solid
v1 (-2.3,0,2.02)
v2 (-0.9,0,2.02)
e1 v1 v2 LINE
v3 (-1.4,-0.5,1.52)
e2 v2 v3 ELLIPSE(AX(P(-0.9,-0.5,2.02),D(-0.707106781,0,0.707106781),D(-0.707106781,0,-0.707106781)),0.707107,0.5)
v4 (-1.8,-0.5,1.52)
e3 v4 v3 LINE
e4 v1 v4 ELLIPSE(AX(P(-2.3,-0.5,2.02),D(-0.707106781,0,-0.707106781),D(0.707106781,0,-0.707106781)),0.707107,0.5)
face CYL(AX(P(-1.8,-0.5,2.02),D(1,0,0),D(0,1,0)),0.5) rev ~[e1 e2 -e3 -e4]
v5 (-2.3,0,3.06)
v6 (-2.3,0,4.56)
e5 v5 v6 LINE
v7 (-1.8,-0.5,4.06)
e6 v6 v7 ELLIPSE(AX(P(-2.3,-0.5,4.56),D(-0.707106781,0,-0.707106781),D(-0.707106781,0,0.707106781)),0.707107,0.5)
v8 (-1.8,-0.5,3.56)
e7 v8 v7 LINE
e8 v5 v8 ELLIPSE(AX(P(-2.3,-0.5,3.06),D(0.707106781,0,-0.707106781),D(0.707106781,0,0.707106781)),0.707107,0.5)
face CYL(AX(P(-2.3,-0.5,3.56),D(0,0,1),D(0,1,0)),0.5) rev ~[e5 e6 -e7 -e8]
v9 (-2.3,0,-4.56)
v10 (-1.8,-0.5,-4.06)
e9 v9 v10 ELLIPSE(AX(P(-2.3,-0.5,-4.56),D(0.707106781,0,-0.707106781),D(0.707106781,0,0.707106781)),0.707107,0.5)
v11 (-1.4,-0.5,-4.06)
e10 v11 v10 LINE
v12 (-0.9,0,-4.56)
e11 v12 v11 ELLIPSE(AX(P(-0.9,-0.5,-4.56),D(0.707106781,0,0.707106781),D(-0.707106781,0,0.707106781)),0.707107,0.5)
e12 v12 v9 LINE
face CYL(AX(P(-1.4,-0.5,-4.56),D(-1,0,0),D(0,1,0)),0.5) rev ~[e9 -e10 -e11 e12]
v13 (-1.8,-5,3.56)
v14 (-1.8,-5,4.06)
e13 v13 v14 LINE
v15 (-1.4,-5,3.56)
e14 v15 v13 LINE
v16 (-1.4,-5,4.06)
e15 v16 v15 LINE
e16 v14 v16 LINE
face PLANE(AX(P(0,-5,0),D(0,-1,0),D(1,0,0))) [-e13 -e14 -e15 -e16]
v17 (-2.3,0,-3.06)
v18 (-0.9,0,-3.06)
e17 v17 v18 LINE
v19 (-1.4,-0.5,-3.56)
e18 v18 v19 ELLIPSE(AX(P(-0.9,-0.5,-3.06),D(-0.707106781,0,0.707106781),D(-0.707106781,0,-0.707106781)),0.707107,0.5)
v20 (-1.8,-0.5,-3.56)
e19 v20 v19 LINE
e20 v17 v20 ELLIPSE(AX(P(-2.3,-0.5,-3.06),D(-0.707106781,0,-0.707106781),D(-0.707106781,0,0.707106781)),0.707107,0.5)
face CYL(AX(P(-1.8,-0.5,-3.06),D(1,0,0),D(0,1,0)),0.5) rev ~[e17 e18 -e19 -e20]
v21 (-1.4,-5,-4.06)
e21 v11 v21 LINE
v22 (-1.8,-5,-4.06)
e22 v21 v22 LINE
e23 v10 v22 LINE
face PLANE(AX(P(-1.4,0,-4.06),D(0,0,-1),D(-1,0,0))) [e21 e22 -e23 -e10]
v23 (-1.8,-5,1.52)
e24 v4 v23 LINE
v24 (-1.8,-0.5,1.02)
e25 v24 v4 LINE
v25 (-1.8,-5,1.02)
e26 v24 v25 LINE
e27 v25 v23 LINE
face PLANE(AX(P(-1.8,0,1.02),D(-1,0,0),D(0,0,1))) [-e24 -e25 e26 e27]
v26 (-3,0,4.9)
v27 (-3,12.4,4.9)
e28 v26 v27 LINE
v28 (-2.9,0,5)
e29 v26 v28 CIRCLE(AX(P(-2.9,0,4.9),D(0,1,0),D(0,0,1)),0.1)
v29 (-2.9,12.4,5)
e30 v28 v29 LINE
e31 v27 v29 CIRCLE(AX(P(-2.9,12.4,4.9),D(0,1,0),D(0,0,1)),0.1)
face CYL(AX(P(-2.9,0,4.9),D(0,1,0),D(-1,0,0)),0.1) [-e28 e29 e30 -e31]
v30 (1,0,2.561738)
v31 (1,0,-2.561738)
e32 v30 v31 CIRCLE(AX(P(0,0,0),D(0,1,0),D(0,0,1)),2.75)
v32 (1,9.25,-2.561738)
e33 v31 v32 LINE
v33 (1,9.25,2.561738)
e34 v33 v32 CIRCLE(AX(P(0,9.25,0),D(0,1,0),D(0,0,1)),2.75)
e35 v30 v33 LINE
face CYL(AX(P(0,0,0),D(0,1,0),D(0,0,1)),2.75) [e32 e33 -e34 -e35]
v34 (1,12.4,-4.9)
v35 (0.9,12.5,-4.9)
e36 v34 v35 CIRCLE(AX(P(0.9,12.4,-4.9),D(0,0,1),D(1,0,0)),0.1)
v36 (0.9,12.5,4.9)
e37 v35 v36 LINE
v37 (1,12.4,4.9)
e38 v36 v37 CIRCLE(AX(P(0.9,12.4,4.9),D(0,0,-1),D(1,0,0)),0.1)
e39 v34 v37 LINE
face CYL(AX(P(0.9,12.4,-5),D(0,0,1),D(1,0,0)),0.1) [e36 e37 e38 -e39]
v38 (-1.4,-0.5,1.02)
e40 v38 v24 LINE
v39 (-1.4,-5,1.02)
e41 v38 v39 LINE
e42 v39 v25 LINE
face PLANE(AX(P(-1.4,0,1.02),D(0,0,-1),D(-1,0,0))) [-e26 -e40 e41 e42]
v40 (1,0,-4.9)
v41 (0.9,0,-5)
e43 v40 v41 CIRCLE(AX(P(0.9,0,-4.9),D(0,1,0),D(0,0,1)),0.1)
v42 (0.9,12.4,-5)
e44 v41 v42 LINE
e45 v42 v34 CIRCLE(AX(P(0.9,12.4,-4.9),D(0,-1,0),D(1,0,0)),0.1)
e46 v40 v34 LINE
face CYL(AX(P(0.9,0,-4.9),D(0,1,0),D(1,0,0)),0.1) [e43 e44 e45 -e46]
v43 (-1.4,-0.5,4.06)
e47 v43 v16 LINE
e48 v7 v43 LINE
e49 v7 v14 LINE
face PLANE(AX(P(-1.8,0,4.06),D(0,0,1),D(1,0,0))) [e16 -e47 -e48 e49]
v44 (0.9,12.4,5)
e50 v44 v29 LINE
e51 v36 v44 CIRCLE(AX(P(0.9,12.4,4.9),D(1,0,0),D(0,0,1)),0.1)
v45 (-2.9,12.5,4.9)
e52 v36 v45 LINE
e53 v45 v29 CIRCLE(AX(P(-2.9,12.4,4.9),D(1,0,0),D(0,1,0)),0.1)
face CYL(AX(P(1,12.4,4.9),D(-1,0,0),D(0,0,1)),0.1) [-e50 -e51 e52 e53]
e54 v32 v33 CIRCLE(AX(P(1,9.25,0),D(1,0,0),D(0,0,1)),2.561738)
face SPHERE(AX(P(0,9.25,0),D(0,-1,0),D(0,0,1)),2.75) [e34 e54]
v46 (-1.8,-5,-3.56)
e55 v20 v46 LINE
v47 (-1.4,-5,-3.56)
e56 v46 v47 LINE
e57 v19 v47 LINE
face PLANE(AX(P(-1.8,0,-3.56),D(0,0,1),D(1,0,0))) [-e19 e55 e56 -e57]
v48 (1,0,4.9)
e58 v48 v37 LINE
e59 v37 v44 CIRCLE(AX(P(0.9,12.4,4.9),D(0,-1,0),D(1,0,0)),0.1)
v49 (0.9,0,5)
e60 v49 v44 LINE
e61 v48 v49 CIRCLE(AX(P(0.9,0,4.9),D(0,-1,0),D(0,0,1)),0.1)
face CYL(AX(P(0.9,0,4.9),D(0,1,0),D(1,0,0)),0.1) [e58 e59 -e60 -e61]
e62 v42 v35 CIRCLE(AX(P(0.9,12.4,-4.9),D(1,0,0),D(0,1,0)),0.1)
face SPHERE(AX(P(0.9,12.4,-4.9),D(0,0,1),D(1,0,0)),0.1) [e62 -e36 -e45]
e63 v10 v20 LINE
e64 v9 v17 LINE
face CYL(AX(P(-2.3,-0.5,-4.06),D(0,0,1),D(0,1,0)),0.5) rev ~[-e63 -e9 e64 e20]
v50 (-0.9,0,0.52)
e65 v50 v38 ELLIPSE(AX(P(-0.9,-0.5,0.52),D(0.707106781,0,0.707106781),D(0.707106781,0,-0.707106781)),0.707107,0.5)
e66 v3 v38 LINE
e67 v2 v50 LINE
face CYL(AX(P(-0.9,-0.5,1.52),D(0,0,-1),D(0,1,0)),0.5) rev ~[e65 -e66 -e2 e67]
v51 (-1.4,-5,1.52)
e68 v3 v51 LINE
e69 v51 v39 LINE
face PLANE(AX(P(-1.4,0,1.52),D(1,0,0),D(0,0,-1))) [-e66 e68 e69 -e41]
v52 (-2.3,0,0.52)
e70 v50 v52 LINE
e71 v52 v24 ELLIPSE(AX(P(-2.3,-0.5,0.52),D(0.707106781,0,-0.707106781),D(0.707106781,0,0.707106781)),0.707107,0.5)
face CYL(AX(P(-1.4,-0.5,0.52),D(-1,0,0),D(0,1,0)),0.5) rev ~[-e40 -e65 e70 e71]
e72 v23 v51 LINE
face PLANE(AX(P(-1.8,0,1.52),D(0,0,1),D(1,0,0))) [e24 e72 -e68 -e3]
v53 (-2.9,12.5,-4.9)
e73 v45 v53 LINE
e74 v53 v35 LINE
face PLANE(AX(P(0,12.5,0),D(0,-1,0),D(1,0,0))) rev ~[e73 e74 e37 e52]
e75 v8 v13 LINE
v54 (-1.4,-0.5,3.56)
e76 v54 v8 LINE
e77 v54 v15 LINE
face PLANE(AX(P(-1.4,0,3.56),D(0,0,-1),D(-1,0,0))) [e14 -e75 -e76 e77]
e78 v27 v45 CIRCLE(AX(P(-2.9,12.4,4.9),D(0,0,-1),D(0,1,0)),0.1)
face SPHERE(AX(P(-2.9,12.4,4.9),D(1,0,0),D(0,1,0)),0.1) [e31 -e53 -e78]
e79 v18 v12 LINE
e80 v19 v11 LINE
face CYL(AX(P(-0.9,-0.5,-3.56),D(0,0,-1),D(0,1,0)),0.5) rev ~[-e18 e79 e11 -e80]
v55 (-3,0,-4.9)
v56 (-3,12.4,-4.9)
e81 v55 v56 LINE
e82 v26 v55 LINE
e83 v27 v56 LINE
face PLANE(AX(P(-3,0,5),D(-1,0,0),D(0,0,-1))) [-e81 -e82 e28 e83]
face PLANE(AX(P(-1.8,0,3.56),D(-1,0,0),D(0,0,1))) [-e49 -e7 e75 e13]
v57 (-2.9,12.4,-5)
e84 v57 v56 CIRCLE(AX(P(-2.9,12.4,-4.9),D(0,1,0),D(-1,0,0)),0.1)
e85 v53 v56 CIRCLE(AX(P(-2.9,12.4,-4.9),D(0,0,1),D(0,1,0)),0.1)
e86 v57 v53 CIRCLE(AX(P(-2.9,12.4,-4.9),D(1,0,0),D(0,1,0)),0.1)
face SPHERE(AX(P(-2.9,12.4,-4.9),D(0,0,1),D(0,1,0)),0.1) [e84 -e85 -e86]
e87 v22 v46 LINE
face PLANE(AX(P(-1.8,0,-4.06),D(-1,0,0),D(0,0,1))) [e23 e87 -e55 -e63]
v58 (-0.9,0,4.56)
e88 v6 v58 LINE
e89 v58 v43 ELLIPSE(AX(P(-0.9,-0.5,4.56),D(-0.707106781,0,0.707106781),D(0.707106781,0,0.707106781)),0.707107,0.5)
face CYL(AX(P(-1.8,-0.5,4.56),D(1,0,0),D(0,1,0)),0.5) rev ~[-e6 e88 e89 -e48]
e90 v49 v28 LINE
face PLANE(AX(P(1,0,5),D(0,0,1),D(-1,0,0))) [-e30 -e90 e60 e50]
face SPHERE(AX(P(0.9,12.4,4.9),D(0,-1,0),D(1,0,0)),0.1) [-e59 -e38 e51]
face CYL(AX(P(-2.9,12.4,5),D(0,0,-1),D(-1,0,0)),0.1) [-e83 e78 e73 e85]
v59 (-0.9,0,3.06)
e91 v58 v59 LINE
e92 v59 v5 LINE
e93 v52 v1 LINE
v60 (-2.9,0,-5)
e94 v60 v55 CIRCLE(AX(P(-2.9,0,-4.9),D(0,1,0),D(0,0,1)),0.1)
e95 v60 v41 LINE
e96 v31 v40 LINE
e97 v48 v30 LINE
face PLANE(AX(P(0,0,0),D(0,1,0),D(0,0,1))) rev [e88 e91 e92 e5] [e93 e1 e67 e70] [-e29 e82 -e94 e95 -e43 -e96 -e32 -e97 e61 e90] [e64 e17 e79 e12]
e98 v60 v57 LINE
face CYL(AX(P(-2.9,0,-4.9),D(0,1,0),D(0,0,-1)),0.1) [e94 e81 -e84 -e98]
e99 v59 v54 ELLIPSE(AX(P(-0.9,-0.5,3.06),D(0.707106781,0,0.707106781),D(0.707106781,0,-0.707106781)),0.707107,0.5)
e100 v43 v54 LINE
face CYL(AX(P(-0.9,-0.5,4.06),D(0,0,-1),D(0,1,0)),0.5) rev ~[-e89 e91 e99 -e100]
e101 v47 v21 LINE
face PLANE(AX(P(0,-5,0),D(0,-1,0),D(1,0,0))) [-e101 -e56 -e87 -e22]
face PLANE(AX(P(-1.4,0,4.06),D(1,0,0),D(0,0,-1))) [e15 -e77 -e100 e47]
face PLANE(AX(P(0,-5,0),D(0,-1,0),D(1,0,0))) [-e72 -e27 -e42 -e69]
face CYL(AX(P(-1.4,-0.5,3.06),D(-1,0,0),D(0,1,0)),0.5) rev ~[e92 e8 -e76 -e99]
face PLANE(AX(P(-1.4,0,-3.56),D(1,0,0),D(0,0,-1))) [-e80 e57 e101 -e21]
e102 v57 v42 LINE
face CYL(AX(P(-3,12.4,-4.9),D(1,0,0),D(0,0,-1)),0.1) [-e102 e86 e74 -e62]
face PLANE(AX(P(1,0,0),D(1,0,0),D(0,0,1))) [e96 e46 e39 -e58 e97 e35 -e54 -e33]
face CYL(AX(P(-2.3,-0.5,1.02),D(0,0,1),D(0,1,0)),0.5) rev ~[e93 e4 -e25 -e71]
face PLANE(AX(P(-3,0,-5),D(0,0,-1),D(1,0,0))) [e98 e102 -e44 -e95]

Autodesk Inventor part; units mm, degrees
ref_plane "YZ Plane" through (0, 0, 0) normal (1, 0, 0) x (0, 1, 0)
ref_plane "XZ Plane" through (0, 0, 0) normal (0, 1, 0) x (-1, 0, 0)
ref_plane "XY Plane" through (0, 0, 0) normal (0, 0, 1) x (1, 0, 0)
sketch "Sketch4" plane through (0, 0, 0) normal (1, 0, 0) x (0, 1, 0)
  line L0 (0, 0) -> (12, 0)
  line L1 (12, 0) -> (12, -2.75)
  line L2 (12, -2.75) -> (0, -2.75)
  line L3 (0, -2.75) -> (0, 0)
  line L4 (12, 0) -> (0, 0)
  line L5 (0, 0) -> (0, 2.75)
  line L6 (0, 2.75) -> (12, 2.75)
  line L7 (12, 2.75) -> (12, 0)
  circle A0 centre (9.25, 0) radius 2.75
  point P0 (9.25, 2.75)
  dimension "d7" = 12
  dimension "d8" = 2.75
  dimension "d9" = 12
  dimension "d10" = 2.75
revolve "Revolution1" add sketch "Sketch4" angle 360 about axis through (0, 0, 0) along (0, 1, 0) picked at (9.8215, 0.7167) contours L5 L6 A0 L0 | A0 L0
sketch "Sketch5" plane through (0, 0, 0) normal (0, -1, 0) x (1, 0, 0)
  circle A0 centre (0, 0) radius 2.75 projected
  line L0 (0, 0) -> (1, 0)
  line L1 (1, 0) -> (1, 5)
  line L2 (1, 5) -> (-3, 5)
  line L3 (-3, 5) -> (-3, -5)
  line L4 (-3, -5) -> (1, -5)
  line L5 (1, -5) -> (1, 5)
  dimension "d12" = 1
  dimension "d13" = 5
  dimension "d14" = 4
  dimension "d15" = 10
extrude "Extrusion3" add sketch "Sketch5" against normal blind 12.5 contours L1 L5 A0 | A0 L5 L4 L3 L2 L1 picked at (-1.4731, -0.2204)
fillet "Fillet1" radius 0.1 8 edges at (1, 6.25, 5) (1, 12.5, 0) (-1, 12.5, 5) (-3, 12.5, 0) (1, 6.25, -5) (-1, 12.5, -5) (-3, 6.25, -5) (-3, 6.25, 5)
sketch "Sketch6" plane through (0, 0, 0) normal (0, -1, 0) x (1, 0, 0)
  line L0 (-3, -4.9) -> (-3, 4.9) projected
  line L1 (-1.8, 4.06) -> (-1.4, 4.06)
  line L2 (-1.4, 4.06) -> (-1.4, 3.56)
  line L3 (-1.4, 3.56) -> (-1.8, 3.56)
  line L4 (-1.8, 3.56) -> (-1.8, 4.06)
  line L5 (-1.8, 4.06) -> (-1.4, 3.56) construction
  line L6 (-1.4, 4.06) -> (-1.8, 3.56) construction
  line L7 (-1.8, -3.56) -> (-1.4, -3.56)
  line L8 (-1.4, -3.56) -> (-1.4, -4.06)
  line L9 (-1.4, -4.06) -> (-1.8, -4.06)
  line L10 (-1.8, -4.06) -> (-1.8, -3.56)
  line L11 (-1.8, -3.56) -> (-1.4, -4.06) construction
  line L12 (-1.4, -3.56) -> (-1.8, -4.06) construction
  line L13 (-1.8, 1.52) -> (-1.4, 1.52)
  line L14 (-1.4, 1.52) -> (-1.4, 1.02)
  line L15 (-1.4, 1.02) -> (-1.8, 1.02)
  line L16 (-1.8, 1.02) -> (-1.8, 1.52)
  line L17 (-1.8, 1.52) -> (-1.4, 1.02) construction
  line L18 (-1.4, 1.52) -> (-1.8, 1.02) construction
  point P0 (0, 0)
  dimension "d22" = 0.4
  dimension "d23" = 0.5
  dimension "d24" = 0.4
  dimension "d25" = 0.5
  dimension "d27" = 0.4
  dimension "d28" = 0.5
extrude "Extrusion4" add sketch "Sketch6" along normal blind 5
fillet "Fillet2" radius 0.5 12 edges at (-1.8, 0, 3.81) (-1.6, 0, 4.06) (-1.4, 0, 3.81) (-1.6, 0, 3.56) (-1.4, 0, 1.27) (-1.6, 0, 1.52) (-1.8, 0, 1.27) (-1.6, 0, 1.02) (-1.8, 0, -3.81) (-1.6, 0, -4.06) (-1.4, 0, -3.81) (-1.6, 0, -3.56)
properties part number "TSOP312"
